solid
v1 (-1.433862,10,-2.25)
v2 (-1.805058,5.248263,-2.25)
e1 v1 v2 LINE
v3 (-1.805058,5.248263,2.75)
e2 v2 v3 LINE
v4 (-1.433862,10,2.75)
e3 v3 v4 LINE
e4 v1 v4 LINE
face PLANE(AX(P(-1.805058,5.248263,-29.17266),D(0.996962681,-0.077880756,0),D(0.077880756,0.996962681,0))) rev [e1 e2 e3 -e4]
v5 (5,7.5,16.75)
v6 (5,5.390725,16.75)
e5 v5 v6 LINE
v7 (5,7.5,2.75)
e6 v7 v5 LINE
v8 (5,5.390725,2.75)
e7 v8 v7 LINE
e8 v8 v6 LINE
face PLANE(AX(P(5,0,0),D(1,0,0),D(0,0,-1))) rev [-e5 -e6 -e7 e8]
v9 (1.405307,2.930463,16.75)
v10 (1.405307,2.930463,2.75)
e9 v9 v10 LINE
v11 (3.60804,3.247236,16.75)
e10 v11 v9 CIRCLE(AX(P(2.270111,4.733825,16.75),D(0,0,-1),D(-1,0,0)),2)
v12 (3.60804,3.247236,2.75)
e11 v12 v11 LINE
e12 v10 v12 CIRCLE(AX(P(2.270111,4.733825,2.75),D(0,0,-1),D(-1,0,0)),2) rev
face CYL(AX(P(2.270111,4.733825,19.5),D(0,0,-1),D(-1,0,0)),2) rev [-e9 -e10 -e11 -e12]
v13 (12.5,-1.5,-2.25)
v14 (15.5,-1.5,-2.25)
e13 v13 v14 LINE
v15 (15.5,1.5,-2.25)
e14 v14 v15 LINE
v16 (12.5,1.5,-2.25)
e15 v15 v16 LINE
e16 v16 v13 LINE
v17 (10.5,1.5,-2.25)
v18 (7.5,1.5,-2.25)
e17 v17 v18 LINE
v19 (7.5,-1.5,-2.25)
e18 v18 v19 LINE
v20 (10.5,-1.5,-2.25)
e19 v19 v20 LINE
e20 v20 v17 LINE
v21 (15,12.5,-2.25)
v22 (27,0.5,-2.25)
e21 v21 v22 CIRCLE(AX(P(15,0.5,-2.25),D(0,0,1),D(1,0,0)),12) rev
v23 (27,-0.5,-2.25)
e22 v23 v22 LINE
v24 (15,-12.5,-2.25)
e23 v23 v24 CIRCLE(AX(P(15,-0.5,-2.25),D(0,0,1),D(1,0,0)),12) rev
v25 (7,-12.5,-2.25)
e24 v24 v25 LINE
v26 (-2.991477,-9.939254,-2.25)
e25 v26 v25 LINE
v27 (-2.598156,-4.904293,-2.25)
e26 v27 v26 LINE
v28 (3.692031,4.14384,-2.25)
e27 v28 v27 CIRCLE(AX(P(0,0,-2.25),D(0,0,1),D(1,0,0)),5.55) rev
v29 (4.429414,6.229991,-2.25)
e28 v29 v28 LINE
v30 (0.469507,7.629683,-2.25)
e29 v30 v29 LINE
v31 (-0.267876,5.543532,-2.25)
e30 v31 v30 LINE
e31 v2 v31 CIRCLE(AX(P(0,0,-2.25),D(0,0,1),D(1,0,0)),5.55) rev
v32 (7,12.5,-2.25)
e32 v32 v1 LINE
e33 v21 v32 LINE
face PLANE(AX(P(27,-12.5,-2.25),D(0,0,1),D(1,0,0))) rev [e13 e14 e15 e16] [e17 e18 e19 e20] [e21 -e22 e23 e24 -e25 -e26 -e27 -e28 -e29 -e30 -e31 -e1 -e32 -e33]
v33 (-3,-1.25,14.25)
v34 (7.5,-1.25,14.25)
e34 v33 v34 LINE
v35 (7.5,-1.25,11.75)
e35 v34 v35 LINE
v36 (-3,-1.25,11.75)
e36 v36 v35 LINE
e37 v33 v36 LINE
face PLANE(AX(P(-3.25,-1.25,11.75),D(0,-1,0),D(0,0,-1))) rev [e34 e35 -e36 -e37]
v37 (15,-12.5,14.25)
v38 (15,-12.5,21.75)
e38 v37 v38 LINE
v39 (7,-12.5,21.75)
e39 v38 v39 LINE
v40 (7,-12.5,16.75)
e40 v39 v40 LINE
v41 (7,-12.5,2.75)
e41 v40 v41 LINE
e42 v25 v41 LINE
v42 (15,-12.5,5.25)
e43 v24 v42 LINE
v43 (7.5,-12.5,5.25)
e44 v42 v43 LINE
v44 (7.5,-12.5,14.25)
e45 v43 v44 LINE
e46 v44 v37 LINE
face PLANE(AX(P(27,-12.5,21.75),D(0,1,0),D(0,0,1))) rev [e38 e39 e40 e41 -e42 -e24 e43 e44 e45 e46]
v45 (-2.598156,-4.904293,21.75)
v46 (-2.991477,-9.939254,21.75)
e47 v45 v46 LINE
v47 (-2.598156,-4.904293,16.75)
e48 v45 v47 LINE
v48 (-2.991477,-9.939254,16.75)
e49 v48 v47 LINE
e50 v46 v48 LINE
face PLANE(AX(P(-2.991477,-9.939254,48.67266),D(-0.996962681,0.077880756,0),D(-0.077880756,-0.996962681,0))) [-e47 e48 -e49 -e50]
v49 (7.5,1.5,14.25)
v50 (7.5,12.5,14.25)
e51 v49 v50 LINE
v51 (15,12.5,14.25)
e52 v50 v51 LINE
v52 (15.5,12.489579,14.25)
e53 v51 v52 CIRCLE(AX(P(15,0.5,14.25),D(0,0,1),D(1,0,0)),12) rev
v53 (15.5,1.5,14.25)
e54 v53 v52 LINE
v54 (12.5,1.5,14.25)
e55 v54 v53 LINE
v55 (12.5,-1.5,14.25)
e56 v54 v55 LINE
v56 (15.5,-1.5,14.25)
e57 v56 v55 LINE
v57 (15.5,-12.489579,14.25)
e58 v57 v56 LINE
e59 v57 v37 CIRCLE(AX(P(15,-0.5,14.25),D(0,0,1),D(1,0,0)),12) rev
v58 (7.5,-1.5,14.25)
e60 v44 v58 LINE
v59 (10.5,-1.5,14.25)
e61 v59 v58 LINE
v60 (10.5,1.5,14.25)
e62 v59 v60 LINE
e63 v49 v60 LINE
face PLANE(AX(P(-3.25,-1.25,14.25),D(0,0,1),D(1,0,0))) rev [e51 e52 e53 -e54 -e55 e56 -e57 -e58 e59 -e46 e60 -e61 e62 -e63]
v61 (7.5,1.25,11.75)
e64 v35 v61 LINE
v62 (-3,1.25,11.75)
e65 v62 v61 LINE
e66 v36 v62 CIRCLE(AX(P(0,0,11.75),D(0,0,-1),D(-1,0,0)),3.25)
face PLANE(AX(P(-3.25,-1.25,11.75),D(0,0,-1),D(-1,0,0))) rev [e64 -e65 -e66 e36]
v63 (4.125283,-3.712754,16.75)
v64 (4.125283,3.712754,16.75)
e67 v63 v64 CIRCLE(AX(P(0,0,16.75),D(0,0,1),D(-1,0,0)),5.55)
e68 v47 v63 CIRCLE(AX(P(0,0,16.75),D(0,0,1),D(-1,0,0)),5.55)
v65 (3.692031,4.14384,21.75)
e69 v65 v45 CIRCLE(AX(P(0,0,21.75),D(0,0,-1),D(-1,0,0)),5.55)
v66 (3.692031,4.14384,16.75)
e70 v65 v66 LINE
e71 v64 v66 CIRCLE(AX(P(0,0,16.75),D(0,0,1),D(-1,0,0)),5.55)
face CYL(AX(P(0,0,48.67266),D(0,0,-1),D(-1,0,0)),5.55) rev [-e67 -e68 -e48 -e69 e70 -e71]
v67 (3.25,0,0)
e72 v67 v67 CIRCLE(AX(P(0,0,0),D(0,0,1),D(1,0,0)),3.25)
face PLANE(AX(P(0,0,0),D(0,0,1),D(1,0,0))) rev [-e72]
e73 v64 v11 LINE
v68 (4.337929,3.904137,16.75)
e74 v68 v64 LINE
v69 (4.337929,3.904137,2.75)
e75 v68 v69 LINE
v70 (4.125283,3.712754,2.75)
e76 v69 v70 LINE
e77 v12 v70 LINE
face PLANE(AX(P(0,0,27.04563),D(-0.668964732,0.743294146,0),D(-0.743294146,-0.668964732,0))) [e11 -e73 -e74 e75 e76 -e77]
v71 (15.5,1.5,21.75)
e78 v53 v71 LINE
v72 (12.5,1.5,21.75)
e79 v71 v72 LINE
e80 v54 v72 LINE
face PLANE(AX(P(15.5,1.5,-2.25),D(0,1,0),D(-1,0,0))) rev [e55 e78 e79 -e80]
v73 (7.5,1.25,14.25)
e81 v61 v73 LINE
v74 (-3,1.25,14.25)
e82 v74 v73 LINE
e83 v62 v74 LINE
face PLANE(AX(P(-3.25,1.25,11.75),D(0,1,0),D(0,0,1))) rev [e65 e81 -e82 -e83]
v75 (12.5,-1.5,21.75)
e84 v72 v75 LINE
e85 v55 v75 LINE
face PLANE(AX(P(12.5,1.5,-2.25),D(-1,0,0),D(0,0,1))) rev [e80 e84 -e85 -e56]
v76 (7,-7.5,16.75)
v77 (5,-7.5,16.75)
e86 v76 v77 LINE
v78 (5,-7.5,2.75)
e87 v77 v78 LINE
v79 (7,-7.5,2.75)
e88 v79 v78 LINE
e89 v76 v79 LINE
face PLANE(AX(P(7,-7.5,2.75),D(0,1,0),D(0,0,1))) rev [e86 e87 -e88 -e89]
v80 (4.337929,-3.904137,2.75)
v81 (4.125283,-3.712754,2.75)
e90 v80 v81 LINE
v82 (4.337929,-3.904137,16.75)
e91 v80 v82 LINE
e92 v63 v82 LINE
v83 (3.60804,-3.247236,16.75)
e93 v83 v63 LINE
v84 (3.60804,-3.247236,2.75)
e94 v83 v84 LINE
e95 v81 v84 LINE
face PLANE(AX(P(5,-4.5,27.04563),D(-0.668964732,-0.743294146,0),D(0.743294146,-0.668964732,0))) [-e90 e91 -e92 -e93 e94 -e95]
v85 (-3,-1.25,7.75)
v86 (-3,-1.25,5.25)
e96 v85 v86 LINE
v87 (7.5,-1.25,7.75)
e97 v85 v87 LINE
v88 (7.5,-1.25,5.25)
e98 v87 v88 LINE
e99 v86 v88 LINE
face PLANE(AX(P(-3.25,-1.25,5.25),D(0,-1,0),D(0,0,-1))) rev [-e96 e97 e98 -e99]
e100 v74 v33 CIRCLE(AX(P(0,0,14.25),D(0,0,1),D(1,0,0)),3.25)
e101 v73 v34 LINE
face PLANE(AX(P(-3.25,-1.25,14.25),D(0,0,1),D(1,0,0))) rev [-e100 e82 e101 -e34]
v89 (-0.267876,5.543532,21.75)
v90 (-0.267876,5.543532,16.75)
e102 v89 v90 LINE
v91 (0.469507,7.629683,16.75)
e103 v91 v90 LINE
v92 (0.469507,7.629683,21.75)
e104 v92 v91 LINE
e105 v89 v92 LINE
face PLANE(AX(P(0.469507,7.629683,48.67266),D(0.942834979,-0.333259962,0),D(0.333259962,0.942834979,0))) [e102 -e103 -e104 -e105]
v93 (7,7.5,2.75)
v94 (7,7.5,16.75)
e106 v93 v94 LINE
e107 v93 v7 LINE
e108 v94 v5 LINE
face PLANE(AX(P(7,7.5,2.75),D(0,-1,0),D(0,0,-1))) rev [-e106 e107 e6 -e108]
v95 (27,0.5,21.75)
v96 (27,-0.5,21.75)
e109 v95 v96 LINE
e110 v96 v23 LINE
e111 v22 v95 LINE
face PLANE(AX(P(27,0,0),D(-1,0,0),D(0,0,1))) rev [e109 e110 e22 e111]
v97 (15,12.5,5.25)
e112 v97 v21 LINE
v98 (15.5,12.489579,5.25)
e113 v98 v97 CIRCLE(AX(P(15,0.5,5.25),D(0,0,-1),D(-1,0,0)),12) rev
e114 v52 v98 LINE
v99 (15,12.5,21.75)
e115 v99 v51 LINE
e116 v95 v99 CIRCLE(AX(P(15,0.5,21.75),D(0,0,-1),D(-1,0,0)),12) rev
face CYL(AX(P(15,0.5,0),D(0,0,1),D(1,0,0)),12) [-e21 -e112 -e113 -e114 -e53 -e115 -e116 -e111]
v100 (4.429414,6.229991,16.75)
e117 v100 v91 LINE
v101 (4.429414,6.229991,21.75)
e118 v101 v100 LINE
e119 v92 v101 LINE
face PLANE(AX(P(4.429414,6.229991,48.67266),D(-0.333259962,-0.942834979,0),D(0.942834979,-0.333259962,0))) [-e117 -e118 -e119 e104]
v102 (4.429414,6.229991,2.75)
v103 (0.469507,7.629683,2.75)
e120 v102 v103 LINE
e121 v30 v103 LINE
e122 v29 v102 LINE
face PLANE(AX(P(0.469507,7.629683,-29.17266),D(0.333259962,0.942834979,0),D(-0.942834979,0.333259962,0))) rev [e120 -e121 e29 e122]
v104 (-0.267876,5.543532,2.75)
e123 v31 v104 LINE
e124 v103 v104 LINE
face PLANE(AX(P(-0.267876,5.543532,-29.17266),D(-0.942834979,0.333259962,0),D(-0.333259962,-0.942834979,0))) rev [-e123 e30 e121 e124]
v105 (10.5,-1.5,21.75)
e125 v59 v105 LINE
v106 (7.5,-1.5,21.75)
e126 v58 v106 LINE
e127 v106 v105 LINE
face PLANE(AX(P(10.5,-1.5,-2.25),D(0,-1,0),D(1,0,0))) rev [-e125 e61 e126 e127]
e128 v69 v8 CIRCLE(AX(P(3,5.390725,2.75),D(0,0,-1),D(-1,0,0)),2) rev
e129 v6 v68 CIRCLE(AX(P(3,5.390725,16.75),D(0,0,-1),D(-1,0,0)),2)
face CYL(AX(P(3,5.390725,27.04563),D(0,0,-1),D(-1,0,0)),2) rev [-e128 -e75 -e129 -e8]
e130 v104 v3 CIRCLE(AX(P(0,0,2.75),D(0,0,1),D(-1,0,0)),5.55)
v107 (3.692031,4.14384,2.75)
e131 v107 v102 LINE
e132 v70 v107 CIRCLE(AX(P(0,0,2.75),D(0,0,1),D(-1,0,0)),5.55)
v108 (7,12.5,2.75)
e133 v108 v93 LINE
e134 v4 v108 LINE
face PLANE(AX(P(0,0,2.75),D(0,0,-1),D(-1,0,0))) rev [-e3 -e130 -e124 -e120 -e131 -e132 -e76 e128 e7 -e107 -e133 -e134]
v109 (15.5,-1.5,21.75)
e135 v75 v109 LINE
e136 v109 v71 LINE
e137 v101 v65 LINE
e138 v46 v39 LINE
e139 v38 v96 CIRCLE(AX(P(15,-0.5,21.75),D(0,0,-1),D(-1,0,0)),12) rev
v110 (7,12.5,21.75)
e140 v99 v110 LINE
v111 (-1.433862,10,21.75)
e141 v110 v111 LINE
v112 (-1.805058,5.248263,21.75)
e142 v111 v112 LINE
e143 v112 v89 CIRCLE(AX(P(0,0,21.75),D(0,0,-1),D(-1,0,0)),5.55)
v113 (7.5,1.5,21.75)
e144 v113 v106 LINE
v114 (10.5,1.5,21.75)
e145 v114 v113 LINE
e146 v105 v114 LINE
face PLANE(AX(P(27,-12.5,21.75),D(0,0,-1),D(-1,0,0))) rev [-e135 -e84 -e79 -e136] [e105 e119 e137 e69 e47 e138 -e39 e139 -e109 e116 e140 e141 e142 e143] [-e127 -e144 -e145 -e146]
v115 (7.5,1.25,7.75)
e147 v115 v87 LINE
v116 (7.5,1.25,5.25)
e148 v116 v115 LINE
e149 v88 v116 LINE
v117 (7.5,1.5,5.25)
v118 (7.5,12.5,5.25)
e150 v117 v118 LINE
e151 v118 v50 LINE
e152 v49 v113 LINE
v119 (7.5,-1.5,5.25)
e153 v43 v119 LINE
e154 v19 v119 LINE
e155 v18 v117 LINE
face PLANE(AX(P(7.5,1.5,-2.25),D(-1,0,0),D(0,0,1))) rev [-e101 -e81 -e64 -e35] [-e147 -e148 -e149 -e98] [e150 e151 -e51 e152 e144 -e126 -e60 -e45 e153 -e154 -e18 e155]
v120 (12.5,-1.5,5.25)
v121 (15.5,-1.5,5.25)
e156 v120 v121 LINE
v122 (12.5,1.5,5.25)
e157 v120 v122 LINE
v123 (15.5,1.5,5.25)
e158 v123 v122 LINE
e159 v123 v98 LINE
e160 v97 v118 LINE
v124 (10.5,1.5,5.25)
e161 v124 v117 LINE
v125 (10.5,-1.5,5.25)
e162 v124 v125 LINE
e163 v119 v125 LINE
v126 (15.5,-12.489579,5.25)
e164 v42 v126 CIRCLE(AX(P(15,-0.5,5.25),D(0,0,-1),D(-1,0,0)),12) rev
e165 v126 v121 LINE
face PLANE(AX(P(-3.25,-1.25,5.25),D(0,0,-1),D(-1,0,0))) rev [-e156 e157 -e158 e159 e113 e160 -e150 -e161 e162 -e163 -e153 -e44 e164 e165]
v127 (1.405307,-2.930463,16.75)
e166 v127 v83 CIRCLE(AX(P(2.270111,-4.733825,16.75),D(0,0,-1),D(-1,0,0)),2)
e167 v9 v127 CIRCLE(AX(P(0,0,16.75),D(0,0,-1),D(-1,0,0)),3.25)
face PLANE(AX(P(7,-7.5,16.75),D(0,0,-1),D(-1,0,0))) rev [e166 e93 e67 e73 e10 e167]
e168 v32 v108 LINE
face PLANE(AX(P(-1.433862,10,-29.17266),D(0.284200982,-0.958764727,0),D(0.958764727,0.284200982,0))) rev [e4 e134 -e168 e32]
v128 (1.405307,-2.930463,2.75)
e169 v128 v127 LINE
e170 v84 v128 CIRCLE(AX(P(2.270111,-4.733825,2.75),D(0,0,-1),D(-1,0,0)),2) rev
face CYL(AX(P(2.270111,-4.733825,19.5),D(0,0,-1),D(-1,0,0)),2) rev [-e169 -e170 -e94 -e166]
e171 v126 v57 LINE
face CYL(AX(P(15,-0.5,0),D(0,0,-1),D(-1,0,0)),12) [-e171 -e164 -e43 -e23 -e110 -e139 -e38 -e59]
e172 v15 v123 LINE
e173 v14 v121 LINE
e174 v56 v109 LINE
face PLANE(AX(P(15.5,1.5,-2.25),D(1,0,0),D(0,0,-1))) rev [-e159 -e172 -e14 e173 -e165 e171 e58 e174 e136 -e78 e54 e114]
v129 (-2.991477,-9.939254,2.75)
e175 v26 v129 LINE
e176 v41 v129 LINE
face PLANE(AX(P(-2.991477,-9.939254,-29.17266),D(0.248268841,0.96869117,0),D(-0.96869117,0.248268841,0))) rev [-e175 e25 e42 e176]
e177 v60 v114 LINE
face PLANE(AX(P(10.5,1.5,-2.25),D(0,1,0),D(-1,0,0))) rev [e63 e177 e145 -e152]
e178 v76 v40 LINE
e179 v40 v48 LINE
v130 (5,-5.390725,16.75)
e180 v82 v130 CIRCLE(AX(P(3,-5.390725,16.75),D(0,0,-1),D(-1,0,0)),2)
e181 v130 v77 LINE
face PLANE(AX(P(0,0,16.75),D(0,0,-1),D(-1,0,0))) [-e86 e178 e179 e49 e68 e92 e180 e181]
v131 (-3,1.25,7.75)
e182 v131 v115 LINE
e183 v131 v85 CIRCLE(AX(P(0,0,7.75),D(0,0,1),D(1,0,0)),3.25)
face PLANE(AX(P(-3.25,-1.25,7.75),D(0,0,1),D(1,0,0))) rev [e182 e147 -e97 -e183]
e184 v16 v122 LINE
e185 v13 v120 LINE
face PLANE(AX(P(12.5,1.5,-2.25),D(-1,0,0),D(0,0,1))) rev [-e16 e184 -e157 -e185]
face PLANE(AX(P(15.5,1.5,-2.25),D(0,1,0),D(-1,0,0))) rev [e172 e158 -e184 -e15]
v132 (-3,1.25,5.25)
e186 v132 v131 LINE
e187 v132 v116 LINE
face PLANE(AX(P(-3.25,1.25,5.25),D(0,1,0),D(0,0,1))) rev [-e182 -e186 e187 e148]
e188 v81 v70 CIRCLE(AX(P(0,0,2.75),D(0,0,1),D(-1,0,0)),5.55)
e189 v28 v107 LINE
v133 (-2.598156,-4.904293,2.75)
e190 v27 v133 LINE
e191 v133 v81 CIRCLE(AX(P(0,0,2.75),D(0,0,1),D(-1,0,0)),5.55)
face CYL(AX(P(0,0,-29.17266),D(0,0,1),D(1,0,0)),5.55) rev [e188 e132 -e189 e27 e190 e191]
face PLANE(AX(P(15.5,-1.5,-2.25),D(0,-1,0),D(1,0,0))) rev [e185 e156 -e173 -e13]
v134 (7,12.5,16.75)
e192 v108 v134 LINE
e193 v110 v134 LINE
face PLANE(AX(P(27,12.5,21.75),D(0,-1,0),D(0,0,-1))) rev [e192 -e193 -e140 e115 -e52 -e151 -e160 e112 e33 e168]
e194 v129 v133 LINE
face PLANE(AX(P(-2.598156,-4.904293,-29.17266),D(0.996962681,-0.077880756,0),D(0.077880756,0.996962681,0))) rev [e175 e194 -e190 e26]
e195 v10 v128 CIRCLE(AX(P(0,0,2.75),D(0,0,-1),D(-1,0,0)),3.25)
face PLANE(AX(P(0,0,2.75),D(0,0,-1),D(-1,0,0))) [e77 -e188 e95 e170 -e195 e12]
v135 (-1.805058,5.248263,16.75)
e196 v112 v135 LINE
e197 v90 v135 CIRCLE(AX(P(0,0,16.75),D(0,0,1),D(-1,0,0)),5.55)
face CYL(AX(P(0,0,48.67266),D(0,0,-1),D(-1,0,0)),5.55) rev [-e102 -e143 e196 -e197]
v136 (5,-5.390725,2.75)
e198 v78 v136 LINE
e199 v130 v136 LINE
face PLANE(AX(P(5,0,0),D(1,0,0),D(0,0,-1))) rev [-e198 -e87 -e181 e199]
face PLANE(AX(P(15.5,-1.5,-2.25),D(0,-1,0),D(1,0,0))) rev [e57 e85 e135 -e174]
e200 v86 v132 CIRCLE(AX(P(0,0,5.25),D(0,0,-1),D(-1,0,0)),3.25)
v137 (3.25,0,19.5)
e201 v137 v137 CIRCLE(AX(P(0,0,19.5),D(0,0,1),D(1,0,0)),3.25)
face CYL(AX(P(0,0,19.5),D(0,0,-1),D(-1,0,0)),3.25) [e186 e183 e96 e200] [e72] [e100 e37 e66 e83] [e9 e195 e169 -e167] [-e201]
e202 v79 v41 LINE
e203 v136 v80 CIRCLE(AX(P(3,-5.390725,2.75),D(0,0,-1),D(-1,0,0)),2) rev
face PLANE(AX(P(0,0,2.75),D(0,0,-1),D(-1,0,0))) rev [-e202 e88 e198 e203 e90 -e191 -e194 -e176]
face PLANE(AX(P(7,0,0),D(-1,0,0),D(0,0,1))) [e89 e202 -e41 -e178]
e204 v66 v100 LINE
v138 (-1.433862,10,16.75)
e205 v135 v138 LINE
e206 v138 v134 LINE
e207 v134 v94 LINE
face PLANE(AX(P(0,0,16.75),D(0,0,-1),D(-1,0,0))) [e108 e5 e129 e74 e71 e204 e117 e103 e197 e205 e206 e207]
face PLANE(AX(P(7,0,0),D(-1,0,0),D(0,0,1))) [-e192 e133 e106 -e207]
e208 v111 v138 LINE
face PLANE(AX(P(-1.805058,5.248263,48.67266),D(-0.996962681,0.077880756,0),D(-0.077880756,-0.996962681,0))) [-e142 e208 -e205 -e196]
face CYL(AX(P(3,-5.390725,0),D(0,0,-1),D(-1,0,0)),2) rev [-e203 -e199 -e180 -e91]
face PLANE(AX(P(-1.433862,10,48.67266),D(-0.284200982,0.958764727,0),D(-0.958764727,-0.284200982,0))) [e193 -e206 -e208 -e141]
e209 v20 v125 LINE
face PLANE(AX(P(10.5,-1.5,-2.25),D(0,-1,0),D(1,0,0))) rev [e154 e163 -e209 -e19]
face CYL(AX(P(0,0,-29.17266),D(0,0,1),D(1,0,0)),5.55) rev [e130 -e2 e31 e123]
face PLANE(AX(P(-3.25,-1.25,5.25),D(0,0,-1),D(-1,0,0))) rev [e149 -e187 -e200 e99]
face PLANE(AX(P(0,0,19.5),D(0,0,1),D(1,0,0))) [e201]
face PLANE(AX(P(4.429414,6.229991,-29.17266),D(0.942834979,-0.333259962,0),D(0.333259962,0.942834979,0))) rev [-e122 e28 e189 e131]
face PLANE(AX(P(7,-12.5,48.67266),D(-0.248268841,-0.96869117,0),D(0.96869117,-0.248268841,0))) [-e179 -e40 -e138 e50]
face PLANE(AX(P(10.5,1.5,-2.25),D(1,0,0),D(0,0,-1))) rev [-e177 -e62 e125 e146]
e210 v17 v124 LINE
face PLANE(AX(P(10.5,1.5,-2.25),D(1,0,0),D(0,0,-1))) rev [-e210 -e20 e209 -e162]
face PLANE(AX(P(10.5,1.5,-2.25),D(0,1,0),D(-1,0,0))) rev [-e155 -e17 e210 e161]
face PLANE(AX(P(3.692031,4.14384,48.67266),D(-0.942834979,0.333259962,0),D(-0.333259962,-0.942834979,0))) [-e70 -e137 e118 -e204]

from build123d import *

# Parameters (mm, degrees)
SKETCH_1_R          = 3.25
EXTRUDE_1_DEPTH     = 19.5
SKETCH_2_W          = 14
SKETCH_2_H          = 15
EXTRUDE_2_DEPTH     = 2
EXTRUDE_3_DEPTH     = 14
FILLET_1_R          = 2
SKETCH_5_W          = 24
SKETCH_5_H          = 25
EXTRUDE_4_DEPTH     = 20
SKETCH_6_W          = 2.5
SKETCH_6_H          = 2.5
CUT_EXTRUDE_1_DEPTH = 40.298536868
SKETCH_7_W          = 3
SKETCH_7_H          = 3
CUT_EXTRUDE_2_DEPTH = 39.226299847
SKETCH_8_W          = 8
SKETCH_8_H          = 9
CUT_EXTRUDE_3_DEPTH = 43.744151647
SKETCH_9_W          = 2.5
SKETCH_9_H          = 2.5
EXTRUDE_5_DEPTH     = 11.5
FILLET_7_R          = 12
EXTRUDE_6_DEPTH     = 5
EXTRUDE_START       = -5
EXTRUDE_7_DEPTH     = 5


with BuildPart() as part:
    # ｽｹｯﾁ1 → ﾎﾞｽ - 押し出し1 (new body)
    with BuildSketch(Plane.XY):
        Circle(SKETCH_1_R)
    extrude(amount=EXTRUDE_1_DEPTH)



with BuildPart() as body_2:
    # ｽｹｯﾁ2 → ﾎﾞｽ - 押し出し2 (new body)
    with BuildSketch(Plane(origin=(5, 0, 0), x_dir=(0, 0, -1), z_dir=(1, 0, 0))):
        with Locations((-9.75, 0)):
            Rectangle(SKETCH_2_W, SKETCH_2_H)
    extrude(amount=EXTRUDE_2_DEPTH)


with BuildPart() as part_1:
    add(part.part)

    add(body_2.part)  # ﾎﾞｽ - 押し出し3 merges body 2
    # ｽｹｯﾁ3 → ﾎﾞｽ - 押し出し3 (add)
    with BuildSketch(Plane(origin=(0, 0, 2.75), x_dir=(-1, 0, 0), z_dir=(0, 0, -1))):
        Polygon((0, 0), (-5, 4.5), (-5, -4.5), align=None)
    extrude(amount=-EXTRUDE_3_DEPTH)

    # ﾌｨﾚｯﾄ1
    fillet_1_edges = [part_1.edges().sort_by_distance(p)[0] for p in [
        (2.415705975, 2.174135378, 9.75),
        (2.415705975, -2.174135378, 9.75),
        (5, 4.5, 9.75),
        (5, -4.5, 9.75),
    ]]
    fillet(fillet_1_edges, radius=FILLET_1_R)

    # ｽｹｯﾁ5 → ﾎﾞｽ - 押し出し4 (add)
    with BuildSketch(Plane(origin=(7, 0, 0), x_dir=(0, 0, -1), z_dir=(1, 0, 0))):
        with Locations((-9.75, 0)):
            Rectangle(SKETCH_5_W, SKETCH_5_H)
    extrude(amount=EXTRUDE_4_DEPTH)

    # ｽｹｯﾁ6 → ｶｯﾄ - 押し出し1 (cut, through all)
    with BuildSketch(Plane(origin=(27, 0, 0), x_dir=(0, 0, -1), z_dir=(1, 0, 0))):
        with Locations((-13, 0)):
            Rectangle(SKETCH_6_W, SKETCH_6_H)
        with Locations((-6.5, 0)):
            Rectangle(SKETCH_6_W, SKETCH_6_H)
    extrude(amount=-CUT_EXTRUDE_1_DEPTH, mode=Mode.SUBTRACT)

    # ｽｹｯﾁ7 → ｶｯﾄ - 押し出し2 (cut, through all)
    with BuildSketch(Plane.XY.offset(21.75)):
        with Locations((9, 0)):
            Rectangle(SKETCH_7_W, SKETCH_7_H)
        with Locations((14, 0)):
            Rectangle(SKETCH_7_W, SKETCH_7_H)
    extrude(amount=-CUT_EXTRUDE_2_DEPTH, mode=Mode.SUBTRACT)

    # ｽｹｯﾁ8 → ｶｯﾄ - 押し出し3 (cut, through all)
    with BuildSketch(Plane(origin=(0, 12.5, 0), x_dir=(1, 0, 0), z_dir=(0, 1, 0))):
        with Locations((11.5, -9.75)):
            Rectangle(SKETCH_8_W, SKETCH_8_H)
    extrude(amount=-CUT_EXTRUDE_3_DEPTH, mode=Mode.SUBTRACT)

    # ｽｹｯﾁ9 → ﾎﾞｽ - 押し出し5 (add)
    with BuildSketch(Plane.ZY.offset(-15.5)):
        with Locations((13, 0)):
            Rectangle(SKETCH_9_W, SKETCH_9_H)
        with Locations((6.5, 0)):
            Rectangle(SKETCH_9_W, SKETCH_9_H)
    extrude(amount=-EXTRUDE_5_DEPTH)

    # ﾌｨﾚｯﾄ7
    # the kernel refuses this fillet: 12 mm, written as the material it takes off along each edge
    with BuildSketch(Plane(origin=(27, -12.5, 51.75), x_dir=(-1, 0, 0), z_dir=(0, 0, -1))) as fillet_7_piece_1:
        with BuildLine():
            CenterArc((FILLET_7_R, FILLET_7_R), FILLET_7_R, 180, 90)
            Line((0, FILLET_7_R), (0, 0))
            Line((0, 0), (FILLET_7_R, 0))
        make_face()
    extrude(amount=84, mode=Mode.SUBTRACT)
    with BuildSketch(Plane(origin=(27, 12.5, -32.25), x_dir=(0, -1, 0), z_dir=(0, 0, 1))) as fillet_7_piece_2:
        with BuildLine():
            CenterArc((FILLET_7_R, -FILLET_7_R), FILLET_7_R, 90, 90)
            Line((0, -FILLET_7_R), (0, 0))
            Line((0, 0), (FILLET_7_R, 0))
        make_face()
    extrude(amount=84, mode=Mode.SUBTRACT)

    # ｽｹｯﾁ10 → ﾎﾞｽ - 押し出し6 (add)
    with BuildSketch(Plane(origin=(0, 0, 2.75), x_dir=(-1, 0, 0), z_dir=(0, 0, -1))):
        with BuildLine():
            Line((1.805058135, 5.248263058), (1.433861829, 10))
            Line((1.433861829, 10), (-7, 12.5))
            Line((-7, 12.5), (-7, -12.5))
            Line((-7, -12.5), (2.991476943, -9.939253626))
            Line((2.991476943, -9.939253626), (2.598155739, -4.904292687))
            ThreePointArc((2.598155739, -4.904292687), (-4.557007333, -3.167993713), (-3.692030902, 4.143839743))
            Line((-3.692030902, 4.143839743), (-4.42941418, 6.229991174))
            Line((-4.42941418, 6.229991174), (-0.469507268, 7.629683016))
            Line((-0.469507268, 7.629683016), (0.267876009, 5.543531586))
            ThreePointArc((0.267876009, 5.543531586), (1.046928779, 5.450361468), (1.805058135, 5.248263058))
        make_face()
    extrude(amount=EXTRUDE_6_DEPTH)

    # ｽｹｯﾁ11 → ﾎﾞｽ - 押し出し7 (add)
    with BuildSketch(Plane(origin=(0, 0, 16.75), x_dir=(-1, 0, 0), z_dir=(0, 0, -1)).offset(EXTRUDE_START)):
        with BuildLine():
            Line((1.805058135, 5.248263058), (1.433861829, 10))
            Line((1.433861829, 10), (-7, 12.5))
            Line((-7, 12.5), (-7, -12.5))
            Line((-7, -12.5), (2.991476943, -9.939253626))
            Line((2.991476943, -9.939253626), (2.598155739, -4.904292687))
            ThreePointArc((2.598155739, -4.904292687), (-4.557007333, -3.167993713), (-3.692030902, 4.143839743))
            Line((-3.692030902, 4.143839743), (-4.42941418, 6.229991174))
            Line((-4.42941418, 6.229991174), (-0.469507268, 7.629683016))
            Line((-0.469507268, 7.629683016), (0.267876009, 5.543531586))
            ThreePointArc((0.267876009, 5.543531586), (1.046928779, 5.450361468), (1.805058135, 5.248263058))
        make_face()
    extrude(amount=EXTRUDE_7_DEPTH)


solid = part_1.part
